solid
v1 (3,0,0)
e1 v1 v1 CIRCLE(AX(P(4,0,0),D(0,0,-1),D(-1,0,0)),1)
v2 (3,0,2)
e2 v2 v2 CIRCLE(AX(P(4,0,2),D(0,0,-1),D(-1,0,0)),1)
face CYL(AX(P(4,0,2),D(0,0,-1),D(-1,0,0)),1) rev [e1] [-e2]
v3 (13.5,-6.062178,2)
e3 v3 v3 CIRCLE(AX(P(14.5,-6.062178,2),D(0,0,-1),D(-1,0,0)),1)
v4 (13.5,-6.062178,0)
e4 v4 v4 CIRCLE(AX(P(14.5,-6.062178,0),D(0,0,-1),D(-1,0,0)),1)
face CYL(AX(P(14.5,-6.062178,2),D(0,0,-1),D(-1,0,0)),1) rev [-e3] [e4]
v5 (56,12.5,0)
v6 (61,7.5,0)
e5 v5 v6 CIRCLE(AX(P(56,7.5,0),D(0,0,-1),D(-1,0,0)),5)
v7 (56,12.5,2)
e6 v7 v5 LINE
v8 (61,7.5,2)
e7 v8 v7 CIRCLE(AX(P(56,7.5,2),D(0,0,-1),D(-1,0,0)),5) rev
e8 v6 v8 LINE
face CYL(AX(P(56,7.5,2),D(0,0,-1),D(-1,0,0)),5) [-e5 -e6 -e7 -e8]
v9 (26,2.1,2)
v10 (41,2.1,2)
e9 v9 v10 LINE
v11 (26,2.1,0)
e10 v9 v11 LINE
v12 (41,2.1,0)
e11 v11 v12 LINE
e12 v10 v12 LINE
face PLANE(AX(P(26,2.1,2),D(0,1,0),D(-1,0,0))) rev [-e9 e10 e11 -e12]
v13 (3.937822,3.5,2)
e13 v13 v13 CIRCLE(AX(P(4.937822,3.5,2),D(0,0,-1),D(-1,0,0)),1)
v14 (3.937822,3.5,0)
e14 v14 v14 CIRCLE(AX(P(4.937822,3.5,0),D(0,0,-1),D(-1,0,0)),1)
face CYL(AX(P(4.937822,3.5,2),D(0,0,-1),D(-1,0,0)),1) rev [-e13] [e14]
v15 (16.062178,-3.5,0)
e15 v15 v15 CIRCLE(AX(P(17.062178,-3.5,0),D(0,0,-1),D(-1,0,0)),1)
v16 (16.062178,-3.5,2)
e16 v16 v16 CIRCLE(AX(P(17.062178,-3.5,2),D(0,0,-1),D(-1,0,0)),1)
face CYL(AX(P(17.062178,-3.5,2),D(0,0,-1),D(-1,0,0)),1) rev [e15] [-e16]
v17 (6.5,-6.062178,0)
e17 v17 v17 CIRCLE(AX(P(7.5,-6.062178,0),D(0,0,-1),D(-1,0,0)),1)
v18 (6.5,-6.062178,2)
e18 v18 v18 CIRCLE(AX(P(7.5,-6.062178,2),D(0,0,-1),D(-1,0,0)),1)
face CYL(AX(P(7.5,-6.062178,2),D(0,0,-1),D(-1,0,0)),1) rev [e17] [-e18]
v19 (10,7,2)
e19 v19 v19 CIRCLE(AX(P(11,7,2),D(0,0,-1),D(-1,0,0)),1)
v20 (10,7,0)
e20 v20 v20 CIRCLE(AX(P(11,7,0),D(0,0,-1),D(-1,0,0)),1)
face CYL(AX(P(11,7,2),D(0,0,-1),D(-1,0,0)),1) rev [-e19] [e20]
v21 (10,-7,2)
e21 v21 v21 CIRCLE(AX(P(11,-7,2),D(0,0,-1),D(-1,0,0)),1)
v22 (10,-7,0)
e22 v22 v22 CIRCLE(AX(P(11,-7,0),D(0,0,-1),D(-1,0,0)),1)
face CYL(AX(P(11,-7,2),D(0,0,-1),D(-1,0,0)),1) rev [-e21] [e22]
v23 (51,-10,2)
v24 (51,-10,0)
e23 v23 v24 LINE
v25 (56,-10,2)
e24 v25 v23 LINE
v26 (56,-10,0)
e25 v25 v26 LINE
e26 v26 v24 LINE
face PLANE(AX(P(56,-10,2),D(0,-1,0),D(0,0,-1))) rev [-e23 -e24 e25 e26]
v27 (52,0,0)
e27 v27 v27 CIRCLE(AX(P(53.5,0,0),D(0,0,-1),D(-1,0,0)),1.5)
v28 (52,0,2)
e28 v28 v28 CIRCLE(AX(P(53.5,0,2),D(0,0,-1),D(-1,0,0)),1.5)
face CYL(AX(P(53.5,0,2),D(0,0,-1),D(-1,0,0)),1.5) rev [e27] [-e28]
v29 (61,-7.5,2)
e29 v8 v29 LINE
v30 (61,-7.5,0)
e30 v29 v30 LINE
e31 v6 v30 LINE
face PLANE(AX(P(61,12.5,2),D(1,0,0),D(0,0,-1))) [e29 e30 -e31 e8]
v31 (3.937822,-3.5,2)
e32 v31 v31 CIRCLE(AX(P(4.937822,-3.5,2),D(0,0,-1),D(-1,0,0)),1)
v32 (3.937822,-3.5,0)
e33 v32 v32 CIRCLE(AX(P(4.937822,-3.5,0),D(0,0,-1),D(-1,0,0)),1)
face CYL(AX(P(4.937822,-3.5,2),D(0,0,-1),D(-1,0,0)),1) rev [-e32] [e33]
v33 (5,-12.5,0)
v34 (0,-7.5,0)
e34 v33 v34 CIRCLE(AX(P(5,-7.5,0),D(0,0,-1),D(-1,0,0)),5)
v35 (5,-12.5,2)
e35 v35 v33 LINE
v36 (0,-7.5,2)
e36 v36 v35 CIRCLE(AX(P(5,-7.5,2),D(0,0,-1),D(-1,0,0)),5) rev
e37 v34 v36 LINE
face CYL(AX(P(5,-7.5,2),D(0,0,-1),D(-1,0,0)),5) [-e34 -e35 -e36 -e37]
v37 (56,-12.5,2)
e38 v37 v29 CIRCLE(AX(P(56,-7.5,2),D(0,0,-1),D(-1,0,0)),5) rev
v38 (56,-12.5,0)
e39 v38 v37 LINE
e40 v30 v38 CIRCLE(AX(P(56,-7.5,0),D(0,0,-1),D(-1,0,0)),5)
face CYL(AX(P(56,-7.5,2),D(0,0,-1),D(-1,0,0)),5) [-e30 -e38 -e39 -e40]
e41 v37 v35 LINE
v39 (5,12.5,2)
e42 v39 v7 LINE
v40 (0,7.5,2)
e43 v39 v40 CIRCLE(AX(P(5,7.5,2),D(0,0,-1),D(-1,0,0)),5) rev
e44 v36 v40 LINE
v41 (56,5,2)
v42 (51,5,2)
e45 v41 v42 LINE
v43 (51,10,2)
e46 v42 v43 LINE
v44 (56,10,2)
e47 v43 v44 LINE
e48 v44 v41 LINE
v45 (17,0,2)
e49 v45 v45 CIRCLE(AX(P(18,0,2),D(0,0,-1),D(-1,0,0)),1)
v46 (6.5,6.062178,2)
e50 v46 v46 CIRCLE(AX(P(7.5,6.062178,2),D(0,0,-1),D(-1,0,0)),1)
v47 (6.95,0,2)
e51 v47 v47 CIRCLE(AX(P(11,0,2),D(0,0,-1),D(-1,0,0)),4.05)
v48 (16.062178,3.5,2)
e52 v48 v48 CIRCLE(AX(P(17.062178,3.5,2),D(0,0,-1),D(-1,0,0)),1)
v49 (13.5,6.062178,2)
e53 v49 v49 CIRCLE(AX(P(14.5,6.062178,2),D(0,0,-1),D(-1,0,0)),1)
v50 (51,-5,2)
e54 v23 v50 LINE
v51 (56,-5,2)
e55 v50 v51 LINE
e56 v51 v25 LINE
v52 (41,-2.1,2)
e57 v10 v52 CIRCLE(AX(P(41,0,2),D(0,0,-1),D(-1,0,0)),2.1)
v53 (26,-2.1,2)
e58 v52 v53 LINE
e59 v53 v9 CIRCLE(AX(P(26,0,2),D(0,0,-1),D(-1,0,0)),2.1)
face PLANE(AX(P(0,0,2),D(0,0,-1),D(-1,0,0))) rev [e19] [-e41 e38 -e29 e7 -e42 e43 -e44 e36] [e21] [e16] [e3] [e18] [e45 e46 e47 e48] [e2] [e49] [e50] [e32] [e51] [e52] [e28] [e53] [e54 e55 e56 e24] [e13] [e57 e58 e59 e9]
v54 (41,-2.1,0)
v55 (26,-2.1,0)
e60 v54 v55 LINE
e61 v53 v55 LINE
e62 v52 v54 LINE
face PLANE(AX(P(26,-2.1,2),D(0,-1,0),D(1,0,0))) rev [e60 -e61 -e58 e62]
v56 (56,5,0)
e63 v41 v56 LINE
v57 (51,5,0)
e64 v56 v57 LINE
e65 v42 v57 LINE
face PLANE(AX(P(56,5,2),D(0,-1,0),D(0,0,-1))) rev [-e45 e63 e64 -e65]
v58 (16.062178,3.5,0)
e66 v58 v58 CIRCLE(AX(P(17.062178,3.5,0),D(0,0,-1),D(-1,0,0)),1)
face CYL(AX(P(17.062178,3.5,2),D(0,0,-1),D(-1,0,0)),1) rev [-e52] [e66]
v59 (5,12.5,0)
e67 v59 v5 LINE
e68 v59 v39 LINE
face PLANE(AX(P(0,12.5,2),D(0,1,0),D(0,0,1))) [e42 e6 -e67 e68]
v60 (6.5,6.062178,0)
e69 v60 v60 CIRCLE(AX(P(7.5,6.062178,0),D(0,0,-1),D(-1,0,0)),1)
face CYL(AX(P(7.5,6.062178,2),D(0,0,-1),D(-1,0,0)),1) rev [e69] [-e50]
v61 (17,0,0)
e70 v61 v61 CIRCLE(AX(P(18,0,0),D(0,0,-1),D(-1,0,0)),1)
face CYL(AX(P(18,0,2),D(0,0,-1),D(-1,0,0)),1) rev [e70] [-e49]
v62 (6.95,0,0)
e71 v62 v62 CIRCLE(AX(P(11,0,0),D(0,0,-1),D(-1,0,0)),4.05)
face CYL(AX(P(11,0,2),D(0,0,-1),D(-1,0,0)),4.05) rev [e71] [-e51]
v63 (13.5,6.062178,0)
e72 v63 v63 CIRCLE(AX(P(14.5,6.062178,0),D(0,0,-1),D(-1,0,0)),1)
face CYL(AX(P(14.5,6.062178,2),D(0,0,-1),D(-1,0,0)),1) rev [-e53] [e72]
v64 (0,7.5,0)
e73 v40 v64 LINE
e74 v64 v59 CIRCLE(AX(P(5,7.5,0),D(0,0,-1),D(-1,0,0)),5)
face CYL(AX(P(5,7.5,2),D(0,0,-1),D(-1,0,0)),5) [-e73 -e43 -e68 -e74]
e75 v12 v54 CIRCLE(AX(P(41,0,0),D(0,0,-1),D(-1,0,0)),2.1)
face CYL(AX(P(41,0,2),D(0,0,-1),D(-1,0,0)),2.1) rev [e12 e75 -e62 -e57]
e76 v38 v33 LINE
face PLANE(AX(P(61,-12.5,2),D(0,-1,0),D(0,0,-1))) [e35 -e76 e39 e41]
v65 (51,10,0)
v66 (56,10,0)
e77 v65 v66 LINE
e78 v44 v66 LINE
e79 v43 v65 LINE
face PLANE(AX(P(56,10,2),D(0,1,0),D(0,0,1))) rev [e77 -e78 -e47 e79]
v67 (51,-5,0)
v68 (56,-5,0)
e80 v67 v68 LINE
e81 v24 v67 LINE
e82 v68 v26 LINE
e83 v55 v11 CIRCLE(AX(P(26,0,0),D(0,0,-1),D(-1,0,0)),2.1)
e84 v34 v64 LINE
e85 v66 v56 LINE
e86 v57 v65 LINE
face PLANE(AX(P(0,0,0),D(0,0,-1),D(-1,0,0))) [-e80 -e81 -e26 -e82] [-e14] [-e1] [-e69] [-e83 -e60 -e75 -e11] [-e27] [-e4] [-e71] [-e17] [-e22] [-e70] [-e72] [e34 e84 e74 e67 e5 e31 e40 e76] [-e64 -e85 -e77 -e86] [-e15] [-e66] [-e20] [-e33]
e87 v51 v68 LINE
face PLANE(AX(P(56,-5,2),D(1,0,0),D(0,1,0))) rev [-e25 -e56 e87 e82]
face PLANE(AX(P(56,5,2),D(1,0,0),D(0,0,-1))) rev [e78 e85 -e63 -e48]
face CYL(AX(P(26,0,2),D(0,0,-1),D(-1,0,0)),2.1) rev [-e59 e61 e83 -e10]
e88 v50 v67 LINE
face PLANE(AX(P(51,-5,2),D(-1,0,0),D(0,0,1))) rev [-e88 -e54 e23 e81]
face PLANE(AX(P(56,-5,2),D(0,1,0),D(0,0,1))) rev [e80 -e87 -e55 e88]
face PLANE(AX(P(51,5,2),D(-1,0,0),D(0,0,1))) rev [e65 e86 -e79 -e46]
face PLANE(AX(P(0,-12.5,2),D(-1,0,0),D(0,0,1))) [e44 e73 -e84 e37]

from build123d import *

# Parameters (mm, degrees)
BOSS_EXTRU_1_START       = -2
BOSS_EXTRU_1_OUTLINE_W   = 61
BOSS_EXTRU_1_OUTLINE_H   = 25
BOSS_EXTRU_1_OUTLINE_W_2 = 5
BOSS_EXTRU_1_OUTLINE_H_2 = 5
BOSS_EXTRU_1_OUTLINE_R   = 1
BOSS_EXTRU_1_OUTLINE_R_2 = 1.5
BOSS_EXTRU_1_OUTLINE_R_3 = 4.05
BOSS_EXTRU_1_DEPTH       = 2
CONG_1_R                 = 5


# Read off the part's stored shape, not the designer's step: Boss.-Extru.1
with BuildPart() as part:
    # Boss.-Extru.1 outline → Boss.-Extru.1 (new body)
    with BuildSketch(Plane(origin=(0, 0, 0), x_dir=(-1, 0, 0), z_dir=(0, 0, -1)).offset(BOSS_EXTRU_1_START)):
        with Locations((-30.5, 0)):
            Rectangle(BOSS_EXTRU_1_OUTLINE_W, BOSS_EXTRU_1_OUTLINE_H)
        with Locations((-53.5, -7.5)):
            Rectangle(BOSS_EXTRU_1_OUTLINE_W_2, BOSS_EXTRU_1_OUTLINE_H_2, mode=Mode.SUBTRACT)
        with Locations((-11, -7)):
            Circle(BOSS_EXTRU_1_OUTLINE_R, mode=Mode.SUBTRACT)
        with Locations((-17.062177826, -3.5)):
            Circle(BOSS_EXTRU_1_OUTLINE_R, mode=Mode.SUBTRACT)
        with Locations((-14.5, -6.062177826)):
            Circle(BOSS_EXTRU_1_OUTLINE_R, mode=Mode.SUBTRACT)
        with Locations((-7.5, -6.062177826)):
            Circle(BOSS_EXTRU_1_OUTLINE_R, mode=Mode.SUBTRACT)
        with Locations((-4.937822174, -3.5)):
            Circle(BOSS_EXTRU_1_OUTLINE_R, mode=Mode.SUBTRACT)
        with Locations((-53.5, 0)):
            Circle(BOSS_EXTRU_1_OUTLINE_R_2, mode=Mode.SUBTRACT)
        with BuildLine():
            ThreePointArc((-26, 2.1), (-23.9, 0), (-26, -2.1))
            Line((-26, -2.1), (-41, -2.1))
            ThreePointArc((-41, -2.1), (-43.1, 0), (-41, 2.1))
            Line((-41, 2.1), (-26, 2.1))
        make_face(mode=Mode.SUBTRACT)
        with Locations((-53.5, 7.5)):
            Rectangle(BOSS_EXTRU_1_OUTLINE_W_2, BOSS_EXTRU_1_OUTLINE_H_2, mode=Mode.SUBTRACT)
        with Locations((-18, 0)):
            Circle(BOSS_EXTRU_1_OUTLINE_R, mode=Mode.SUBTRACT)
        with Locations((-17.062177826, 3.5)):
            Circle(BOSS_EXTRU_1_OUTLINE_R, mode=Mode.SUBTRACT)
        with Locations((-11, 0)):
            Circle(BOSS_EXTRU_1_OUTLINE_R_3, mode=Mode.SUBTRACT)
        with Locations((-4, 0)):
            Circle(BOSS_EXTRU_1_OUTLINE_R, mode=Mode.SUBTRACT)
        with Locations((-14.5, 6.062177826)):
            Circle(BOSS_EXTRU_1_OUTLINE_R, mode=Mode.SUBTRACT)
        with Locations((-4.937822174, 3.5)):
            Circle(BOSS_EXTRU_1_OUTLINE_R, mode=Mode.SUBTRACT)
        with Locations((-7.5, 6.062177826)):
            Circle(BOSS_EXTRU_1_OUTLINE_R, mode=Mode.SUBTRACT)
        with Locations((-11, 7)):
            Circle(BOSS_EXTRU_1_OUTLINE_R, mode=Mode.SUBTRACT)
    extrude(amount=BOSS_EXTRU_1_DEPTH)

    # Congé1
    cong_1_edges = [part.edges().sort_by_distance(p)[0] for p in [
        (61, 12.5, 1),
        (0, 12.5, 1),
        (0, -12.5, 1),
        (61, -12.5, 1),
    ]]
    fillet(cong_1_edges, radius=CONG_1_R)


solid = part.part
